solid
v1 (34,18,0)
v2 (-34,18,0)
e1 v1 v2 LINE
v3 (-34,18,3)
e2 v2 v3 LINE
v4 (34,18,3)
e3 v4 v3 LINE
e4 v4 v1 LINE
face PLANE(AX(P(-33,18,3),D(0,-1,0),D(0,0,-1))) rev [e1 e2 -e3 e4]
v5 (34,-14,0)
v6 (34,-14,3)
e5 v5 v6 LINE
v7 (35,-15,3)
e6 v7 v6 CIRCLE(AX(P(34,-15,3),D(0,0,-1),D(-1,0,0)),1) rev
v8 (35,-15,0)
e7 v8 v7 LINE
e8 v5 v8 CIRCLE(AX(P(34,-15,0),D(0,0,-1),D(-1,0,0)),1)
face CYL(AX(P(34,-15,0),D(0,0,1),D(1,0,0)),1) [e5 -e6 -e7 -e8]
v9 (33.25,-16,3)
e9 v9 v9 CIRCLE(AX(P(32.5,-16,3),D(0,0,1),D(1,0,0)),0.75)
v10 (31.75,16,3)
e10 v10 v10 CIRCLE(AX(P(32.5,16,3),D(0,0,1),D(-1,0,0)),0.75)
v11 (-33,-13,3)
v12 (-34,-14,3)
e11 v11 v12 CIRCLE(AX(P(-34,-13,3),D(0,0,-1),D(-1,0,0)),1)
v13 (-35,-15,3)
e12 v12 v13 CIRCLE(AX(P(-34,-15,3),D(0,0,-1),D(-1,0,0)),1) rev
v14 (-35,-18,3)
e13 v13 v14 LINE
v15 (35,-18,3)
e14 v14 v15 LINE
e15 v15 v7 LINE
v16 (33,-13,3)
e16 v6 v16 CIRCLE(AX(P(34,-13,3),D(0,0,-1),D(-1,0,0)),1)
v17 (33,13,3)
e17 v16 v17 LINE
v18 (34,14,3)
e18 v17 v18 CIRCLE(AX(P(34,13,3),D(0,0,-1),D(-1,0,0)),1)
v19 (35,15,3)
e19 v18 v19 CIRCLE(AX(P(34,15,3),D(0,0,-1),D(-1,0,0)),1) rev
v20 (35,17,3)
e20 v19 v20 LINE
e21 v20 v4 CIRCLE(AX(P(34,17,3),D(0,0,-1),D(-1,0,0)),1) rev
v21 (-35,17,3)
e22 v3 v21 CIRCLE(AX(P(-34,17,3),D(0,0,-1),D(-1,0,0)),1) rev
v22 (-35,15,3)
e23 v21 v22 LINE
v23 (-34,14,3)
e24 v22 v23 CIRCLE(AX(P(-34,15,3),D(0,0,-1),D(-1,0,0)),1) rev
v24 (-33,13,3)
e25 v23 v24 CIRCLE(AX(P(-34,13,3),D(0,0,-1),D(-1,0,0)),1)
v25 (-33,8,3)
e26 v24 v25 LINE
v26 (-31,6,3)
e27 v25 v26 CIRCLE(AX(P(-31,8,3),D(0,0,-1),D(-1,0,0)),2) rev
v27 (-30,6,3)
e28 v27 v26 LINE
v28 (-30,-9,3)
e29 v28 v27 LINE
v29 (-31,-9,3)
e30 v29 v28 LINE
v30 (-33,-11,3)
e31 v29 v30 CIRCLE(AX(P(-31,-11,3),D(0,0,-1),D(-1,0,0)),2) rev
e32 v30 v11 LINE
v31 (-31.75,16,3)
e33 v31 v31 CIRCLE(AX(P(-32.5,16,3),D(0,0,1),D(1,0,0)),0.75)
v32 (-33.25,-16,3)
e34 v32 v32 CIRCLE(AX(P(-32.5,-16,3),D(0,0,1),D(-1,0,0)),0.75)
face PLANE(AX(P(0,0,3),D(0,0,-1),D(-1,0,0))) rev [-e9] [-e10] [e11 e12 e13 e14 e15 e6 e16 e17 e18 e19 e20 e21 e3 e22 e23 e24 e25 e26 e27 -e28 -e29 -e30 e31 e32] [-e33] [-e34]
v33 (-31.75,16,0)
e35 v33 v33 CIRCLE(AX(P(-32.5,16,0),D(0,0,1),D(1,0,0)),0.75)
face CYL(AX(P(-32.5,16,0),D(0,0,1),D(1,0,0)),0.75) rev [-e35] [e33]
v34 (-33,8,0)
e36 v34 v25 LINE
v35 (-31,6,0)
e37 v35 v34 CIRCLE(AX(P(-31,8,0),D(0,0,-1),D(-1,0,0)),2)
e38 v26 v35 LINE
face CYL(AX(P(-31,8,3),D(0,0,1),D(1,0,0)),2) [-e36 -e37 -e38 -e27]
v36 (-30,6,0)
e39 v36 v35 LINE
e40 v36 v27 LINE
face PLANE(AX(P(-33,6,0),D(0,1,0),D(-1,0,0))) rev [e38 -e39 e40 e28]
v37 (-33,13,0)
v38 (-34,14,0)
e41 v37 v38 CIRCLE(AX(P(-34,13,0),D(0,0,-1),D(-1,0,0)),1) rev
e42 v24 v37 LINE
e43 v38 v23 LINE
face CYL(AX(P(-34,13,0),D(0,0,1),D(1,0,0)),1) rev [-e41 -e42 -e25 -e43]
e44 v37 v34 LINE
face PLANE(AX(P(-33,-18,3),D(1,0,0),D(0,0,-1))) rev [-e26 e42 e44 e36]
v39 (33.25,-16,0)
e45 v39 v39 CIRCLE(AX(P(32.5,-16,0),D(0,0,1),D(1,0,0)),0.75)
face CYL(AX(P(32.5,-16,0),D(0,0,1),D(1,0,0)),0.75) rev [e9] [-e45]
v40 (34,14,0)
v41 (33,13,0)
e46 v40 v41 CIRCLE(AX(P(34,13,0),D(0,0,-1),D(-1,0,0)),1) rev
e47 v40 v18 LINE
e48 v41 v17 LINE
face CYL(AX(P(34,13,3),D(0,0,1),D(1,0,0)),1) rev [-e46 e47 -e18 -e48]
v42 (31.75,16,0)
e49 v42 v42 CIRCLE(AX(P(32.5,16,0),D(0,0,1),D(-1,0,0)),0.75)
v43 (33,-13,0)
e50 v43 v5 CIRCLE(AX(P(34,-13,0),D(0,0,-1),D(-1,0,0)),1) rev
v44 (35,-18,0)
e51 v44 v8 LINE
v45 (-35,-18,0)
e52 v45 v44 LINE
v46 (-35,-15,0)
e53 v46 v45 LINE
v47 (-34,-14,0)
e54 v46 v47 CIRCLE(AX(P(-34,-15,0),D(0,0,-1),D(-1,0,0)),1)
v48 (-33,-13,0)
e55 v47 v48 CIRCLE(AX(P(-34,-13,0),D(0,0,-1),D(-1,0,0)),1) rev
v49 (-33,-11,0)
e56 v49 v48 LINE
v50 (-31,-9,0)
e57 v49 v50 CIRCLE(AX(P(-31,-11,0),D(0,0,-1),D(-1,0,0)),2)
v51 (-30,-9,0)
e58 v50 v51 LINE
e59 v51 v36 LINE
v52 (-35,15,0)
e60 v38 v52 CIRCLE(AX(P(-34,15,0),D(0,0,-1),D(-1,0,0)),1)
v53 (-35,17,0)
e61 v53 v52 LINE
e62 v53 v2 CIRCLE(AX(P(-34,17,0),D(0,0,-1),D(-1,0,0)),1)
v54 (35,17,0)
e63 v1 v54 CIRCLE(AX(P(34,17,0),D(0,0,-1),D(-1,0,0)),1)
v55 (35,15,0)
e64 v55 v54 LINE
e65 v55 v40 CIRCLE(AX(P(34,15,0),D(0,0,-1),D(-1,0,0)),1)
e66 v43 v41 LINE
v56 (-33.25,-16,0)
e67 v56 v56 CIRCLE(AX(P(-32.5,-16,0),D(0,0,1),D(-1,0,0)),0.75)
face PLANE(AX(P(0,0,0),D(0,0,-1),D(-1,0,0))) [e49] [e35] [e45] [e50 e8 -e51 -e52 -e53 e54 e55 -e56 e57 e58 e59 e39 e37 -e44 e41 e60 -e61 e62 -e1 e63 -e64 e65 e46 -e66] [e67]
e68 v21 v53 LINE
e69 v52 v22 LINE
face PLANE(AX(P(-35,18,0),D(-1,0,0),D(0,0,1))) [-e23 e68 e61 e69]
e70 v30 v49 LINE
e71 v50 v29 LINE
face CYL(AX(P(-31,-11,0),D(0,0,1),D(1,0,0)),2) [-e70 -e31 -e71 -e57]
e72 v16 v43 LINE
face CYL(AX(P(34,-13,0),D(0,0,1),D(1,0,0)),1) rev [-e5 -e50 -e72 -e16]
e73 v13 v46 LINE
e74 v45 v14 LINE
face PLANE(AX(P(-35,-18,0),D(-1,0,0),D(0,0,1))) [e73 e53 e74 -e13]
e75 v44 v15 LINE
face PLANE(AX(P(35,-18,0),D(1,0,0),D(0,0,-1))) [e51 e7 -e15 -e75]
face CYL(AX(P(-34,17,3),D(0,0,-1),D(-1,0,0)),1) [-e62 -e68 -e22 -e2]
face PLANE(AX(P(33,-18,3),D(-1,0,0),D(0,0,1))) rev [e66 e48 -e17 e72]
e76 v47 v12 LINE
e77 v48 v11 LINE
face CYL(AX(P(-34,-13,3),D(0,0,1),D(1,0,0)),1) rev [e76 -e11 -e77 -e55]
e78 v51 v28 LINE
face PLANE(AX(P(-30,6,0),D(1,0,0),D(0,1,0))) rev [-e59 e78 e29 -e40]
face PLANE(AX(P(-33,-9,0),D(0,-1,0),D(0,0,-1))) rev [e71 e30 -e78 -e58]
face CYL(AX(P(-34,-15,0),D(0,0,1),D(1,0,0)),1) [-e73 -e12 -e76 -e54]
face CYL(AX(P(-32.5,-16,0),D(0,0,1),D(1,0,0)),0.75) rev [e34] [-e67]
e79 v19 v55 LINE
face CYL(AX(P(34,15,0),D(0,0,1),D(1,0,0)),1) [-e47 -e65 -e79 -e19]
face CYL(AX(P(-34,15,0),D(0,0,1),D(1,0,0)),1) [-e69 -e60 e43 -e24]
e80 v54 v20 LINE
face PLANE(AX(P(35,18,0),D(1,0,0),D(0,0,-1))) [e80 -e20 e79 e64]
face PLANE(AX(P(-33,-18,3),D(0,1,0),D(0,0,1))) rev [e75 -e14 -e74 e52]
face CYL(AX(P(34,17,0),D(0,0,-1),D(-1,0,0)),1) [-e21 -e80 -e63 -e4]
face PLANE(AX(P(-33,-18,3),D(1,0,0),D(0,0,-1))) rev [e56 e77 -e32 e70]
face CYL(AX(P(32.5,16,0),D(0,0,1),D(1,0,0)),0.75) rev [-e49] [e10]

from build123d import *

# Parameters (mm, degrees)
SKETCH1_W           = 66
SKETCH1_H           = 36
BOSS_EXTRUDE1_DEPTH = 3
SKETCH2_W           = 2
SKETCH2_H           = 4
BOSS_EXTRUDE3_DEPTH = 3
SKETCH3_R           = 0.75
CUT_EXTRUDE1_DEPTH  = 40.471508712
SKETCH4_W           = 3
SKETCH4_H           = 15
CUT_EXTRUDE2_DEPTH  = 40.471508712
FILLET2_R           = 2
FILLET3_R           = 1


with BuildPart() as part:
    # Sketch1 → Boss-Extrude1 (new body)
    with BuildSketch(Plane.XY):
        Rectangle(SKETCH1_W, SKETCH1_H)
    extrude(amount=BOSS_EXTRUDE1_DEPTH)

    # Sketch2 → Boss-Extrude3 (add)
    with BuildSketch(Plane.XY.offset(3)):
        with Locations((-34, 16)):
            Rectangle(SKETCH2_W, SKETCH2_H)
        with Locations((-34, -16)):
            Rectangle(SKETCH2_W, SKETCH2_H)
        with Locations((34, 16)):
            Rectangle(SKETCH2_W, SKETCH2_H)
        with Locations((34, -16)):
            Rectangle(SKETCH2_W, SKETCH2_H)
    extrude(amount=-BOSS_EXTRUDE3_DEPTH)

    # Sketch3 → Cut-Extrude1 (cut, through all)
    with BuildSketch(Plane.XY.offset(3)):
        with Locations((-32.5, 16)):
            Circle(SKETCH3_R)
        with Locations(Location((-32.5, -16, 0), (0, 0, 180))):
            Circle(SKETCH3_R)
        with Locations((32.5, -16)):
            Circle(SKETCH3_R)
        with Locations(Location((32.5, 16, 0), (0, 0, 180))):
            Circle(SKETCH3_R)
    extrude(amount=-CUT_EXTRUDE1_DEPTH, mode=Mode.SUBTRACT)

    # Sketch4 → Cut-Extrude2 (cut, through all)
    with BuildSketch(Plane.XY.offset(3)):
        with Locations((-31.5, -1.5)):
            Rectangle(SKETCH4_W, SKETCH4_H)
    extrude(amount=-CUT_EXTRUDE2_DEPTH, mode=Mode.SUBTRACT)

    # Fillet2
    fillet2_edges = [part.edges().sort_by_distance(p)[0] for p in [
        (-33, -9, 1.5),
        (-33, 6, 1.5),
    ]]
    fillet(fillet2_edges, radius=FILLET2_R)

    # Fillet3
    fillet3_edges = [part.edges().sort_by_distance(p)[0] for p in [
        (35, -14, 1.5),
        (33, -14, 1.5),
        (33, 14, 1.5),
        (35, 14, 1.5),
        (35, 18, 1.5),
        (-35, 18, 1.5),
        (-35, 14, 1.5),
        (-33, 14, 1.5),
        (-33, -14, 1.5),
        (-35, -14, 1.5),
    ]]
    fillet(fillet3_edges, radius=FILLET3_R - 0.0001)  # a hair under: the kernel refuses the full size


solid = part.part
